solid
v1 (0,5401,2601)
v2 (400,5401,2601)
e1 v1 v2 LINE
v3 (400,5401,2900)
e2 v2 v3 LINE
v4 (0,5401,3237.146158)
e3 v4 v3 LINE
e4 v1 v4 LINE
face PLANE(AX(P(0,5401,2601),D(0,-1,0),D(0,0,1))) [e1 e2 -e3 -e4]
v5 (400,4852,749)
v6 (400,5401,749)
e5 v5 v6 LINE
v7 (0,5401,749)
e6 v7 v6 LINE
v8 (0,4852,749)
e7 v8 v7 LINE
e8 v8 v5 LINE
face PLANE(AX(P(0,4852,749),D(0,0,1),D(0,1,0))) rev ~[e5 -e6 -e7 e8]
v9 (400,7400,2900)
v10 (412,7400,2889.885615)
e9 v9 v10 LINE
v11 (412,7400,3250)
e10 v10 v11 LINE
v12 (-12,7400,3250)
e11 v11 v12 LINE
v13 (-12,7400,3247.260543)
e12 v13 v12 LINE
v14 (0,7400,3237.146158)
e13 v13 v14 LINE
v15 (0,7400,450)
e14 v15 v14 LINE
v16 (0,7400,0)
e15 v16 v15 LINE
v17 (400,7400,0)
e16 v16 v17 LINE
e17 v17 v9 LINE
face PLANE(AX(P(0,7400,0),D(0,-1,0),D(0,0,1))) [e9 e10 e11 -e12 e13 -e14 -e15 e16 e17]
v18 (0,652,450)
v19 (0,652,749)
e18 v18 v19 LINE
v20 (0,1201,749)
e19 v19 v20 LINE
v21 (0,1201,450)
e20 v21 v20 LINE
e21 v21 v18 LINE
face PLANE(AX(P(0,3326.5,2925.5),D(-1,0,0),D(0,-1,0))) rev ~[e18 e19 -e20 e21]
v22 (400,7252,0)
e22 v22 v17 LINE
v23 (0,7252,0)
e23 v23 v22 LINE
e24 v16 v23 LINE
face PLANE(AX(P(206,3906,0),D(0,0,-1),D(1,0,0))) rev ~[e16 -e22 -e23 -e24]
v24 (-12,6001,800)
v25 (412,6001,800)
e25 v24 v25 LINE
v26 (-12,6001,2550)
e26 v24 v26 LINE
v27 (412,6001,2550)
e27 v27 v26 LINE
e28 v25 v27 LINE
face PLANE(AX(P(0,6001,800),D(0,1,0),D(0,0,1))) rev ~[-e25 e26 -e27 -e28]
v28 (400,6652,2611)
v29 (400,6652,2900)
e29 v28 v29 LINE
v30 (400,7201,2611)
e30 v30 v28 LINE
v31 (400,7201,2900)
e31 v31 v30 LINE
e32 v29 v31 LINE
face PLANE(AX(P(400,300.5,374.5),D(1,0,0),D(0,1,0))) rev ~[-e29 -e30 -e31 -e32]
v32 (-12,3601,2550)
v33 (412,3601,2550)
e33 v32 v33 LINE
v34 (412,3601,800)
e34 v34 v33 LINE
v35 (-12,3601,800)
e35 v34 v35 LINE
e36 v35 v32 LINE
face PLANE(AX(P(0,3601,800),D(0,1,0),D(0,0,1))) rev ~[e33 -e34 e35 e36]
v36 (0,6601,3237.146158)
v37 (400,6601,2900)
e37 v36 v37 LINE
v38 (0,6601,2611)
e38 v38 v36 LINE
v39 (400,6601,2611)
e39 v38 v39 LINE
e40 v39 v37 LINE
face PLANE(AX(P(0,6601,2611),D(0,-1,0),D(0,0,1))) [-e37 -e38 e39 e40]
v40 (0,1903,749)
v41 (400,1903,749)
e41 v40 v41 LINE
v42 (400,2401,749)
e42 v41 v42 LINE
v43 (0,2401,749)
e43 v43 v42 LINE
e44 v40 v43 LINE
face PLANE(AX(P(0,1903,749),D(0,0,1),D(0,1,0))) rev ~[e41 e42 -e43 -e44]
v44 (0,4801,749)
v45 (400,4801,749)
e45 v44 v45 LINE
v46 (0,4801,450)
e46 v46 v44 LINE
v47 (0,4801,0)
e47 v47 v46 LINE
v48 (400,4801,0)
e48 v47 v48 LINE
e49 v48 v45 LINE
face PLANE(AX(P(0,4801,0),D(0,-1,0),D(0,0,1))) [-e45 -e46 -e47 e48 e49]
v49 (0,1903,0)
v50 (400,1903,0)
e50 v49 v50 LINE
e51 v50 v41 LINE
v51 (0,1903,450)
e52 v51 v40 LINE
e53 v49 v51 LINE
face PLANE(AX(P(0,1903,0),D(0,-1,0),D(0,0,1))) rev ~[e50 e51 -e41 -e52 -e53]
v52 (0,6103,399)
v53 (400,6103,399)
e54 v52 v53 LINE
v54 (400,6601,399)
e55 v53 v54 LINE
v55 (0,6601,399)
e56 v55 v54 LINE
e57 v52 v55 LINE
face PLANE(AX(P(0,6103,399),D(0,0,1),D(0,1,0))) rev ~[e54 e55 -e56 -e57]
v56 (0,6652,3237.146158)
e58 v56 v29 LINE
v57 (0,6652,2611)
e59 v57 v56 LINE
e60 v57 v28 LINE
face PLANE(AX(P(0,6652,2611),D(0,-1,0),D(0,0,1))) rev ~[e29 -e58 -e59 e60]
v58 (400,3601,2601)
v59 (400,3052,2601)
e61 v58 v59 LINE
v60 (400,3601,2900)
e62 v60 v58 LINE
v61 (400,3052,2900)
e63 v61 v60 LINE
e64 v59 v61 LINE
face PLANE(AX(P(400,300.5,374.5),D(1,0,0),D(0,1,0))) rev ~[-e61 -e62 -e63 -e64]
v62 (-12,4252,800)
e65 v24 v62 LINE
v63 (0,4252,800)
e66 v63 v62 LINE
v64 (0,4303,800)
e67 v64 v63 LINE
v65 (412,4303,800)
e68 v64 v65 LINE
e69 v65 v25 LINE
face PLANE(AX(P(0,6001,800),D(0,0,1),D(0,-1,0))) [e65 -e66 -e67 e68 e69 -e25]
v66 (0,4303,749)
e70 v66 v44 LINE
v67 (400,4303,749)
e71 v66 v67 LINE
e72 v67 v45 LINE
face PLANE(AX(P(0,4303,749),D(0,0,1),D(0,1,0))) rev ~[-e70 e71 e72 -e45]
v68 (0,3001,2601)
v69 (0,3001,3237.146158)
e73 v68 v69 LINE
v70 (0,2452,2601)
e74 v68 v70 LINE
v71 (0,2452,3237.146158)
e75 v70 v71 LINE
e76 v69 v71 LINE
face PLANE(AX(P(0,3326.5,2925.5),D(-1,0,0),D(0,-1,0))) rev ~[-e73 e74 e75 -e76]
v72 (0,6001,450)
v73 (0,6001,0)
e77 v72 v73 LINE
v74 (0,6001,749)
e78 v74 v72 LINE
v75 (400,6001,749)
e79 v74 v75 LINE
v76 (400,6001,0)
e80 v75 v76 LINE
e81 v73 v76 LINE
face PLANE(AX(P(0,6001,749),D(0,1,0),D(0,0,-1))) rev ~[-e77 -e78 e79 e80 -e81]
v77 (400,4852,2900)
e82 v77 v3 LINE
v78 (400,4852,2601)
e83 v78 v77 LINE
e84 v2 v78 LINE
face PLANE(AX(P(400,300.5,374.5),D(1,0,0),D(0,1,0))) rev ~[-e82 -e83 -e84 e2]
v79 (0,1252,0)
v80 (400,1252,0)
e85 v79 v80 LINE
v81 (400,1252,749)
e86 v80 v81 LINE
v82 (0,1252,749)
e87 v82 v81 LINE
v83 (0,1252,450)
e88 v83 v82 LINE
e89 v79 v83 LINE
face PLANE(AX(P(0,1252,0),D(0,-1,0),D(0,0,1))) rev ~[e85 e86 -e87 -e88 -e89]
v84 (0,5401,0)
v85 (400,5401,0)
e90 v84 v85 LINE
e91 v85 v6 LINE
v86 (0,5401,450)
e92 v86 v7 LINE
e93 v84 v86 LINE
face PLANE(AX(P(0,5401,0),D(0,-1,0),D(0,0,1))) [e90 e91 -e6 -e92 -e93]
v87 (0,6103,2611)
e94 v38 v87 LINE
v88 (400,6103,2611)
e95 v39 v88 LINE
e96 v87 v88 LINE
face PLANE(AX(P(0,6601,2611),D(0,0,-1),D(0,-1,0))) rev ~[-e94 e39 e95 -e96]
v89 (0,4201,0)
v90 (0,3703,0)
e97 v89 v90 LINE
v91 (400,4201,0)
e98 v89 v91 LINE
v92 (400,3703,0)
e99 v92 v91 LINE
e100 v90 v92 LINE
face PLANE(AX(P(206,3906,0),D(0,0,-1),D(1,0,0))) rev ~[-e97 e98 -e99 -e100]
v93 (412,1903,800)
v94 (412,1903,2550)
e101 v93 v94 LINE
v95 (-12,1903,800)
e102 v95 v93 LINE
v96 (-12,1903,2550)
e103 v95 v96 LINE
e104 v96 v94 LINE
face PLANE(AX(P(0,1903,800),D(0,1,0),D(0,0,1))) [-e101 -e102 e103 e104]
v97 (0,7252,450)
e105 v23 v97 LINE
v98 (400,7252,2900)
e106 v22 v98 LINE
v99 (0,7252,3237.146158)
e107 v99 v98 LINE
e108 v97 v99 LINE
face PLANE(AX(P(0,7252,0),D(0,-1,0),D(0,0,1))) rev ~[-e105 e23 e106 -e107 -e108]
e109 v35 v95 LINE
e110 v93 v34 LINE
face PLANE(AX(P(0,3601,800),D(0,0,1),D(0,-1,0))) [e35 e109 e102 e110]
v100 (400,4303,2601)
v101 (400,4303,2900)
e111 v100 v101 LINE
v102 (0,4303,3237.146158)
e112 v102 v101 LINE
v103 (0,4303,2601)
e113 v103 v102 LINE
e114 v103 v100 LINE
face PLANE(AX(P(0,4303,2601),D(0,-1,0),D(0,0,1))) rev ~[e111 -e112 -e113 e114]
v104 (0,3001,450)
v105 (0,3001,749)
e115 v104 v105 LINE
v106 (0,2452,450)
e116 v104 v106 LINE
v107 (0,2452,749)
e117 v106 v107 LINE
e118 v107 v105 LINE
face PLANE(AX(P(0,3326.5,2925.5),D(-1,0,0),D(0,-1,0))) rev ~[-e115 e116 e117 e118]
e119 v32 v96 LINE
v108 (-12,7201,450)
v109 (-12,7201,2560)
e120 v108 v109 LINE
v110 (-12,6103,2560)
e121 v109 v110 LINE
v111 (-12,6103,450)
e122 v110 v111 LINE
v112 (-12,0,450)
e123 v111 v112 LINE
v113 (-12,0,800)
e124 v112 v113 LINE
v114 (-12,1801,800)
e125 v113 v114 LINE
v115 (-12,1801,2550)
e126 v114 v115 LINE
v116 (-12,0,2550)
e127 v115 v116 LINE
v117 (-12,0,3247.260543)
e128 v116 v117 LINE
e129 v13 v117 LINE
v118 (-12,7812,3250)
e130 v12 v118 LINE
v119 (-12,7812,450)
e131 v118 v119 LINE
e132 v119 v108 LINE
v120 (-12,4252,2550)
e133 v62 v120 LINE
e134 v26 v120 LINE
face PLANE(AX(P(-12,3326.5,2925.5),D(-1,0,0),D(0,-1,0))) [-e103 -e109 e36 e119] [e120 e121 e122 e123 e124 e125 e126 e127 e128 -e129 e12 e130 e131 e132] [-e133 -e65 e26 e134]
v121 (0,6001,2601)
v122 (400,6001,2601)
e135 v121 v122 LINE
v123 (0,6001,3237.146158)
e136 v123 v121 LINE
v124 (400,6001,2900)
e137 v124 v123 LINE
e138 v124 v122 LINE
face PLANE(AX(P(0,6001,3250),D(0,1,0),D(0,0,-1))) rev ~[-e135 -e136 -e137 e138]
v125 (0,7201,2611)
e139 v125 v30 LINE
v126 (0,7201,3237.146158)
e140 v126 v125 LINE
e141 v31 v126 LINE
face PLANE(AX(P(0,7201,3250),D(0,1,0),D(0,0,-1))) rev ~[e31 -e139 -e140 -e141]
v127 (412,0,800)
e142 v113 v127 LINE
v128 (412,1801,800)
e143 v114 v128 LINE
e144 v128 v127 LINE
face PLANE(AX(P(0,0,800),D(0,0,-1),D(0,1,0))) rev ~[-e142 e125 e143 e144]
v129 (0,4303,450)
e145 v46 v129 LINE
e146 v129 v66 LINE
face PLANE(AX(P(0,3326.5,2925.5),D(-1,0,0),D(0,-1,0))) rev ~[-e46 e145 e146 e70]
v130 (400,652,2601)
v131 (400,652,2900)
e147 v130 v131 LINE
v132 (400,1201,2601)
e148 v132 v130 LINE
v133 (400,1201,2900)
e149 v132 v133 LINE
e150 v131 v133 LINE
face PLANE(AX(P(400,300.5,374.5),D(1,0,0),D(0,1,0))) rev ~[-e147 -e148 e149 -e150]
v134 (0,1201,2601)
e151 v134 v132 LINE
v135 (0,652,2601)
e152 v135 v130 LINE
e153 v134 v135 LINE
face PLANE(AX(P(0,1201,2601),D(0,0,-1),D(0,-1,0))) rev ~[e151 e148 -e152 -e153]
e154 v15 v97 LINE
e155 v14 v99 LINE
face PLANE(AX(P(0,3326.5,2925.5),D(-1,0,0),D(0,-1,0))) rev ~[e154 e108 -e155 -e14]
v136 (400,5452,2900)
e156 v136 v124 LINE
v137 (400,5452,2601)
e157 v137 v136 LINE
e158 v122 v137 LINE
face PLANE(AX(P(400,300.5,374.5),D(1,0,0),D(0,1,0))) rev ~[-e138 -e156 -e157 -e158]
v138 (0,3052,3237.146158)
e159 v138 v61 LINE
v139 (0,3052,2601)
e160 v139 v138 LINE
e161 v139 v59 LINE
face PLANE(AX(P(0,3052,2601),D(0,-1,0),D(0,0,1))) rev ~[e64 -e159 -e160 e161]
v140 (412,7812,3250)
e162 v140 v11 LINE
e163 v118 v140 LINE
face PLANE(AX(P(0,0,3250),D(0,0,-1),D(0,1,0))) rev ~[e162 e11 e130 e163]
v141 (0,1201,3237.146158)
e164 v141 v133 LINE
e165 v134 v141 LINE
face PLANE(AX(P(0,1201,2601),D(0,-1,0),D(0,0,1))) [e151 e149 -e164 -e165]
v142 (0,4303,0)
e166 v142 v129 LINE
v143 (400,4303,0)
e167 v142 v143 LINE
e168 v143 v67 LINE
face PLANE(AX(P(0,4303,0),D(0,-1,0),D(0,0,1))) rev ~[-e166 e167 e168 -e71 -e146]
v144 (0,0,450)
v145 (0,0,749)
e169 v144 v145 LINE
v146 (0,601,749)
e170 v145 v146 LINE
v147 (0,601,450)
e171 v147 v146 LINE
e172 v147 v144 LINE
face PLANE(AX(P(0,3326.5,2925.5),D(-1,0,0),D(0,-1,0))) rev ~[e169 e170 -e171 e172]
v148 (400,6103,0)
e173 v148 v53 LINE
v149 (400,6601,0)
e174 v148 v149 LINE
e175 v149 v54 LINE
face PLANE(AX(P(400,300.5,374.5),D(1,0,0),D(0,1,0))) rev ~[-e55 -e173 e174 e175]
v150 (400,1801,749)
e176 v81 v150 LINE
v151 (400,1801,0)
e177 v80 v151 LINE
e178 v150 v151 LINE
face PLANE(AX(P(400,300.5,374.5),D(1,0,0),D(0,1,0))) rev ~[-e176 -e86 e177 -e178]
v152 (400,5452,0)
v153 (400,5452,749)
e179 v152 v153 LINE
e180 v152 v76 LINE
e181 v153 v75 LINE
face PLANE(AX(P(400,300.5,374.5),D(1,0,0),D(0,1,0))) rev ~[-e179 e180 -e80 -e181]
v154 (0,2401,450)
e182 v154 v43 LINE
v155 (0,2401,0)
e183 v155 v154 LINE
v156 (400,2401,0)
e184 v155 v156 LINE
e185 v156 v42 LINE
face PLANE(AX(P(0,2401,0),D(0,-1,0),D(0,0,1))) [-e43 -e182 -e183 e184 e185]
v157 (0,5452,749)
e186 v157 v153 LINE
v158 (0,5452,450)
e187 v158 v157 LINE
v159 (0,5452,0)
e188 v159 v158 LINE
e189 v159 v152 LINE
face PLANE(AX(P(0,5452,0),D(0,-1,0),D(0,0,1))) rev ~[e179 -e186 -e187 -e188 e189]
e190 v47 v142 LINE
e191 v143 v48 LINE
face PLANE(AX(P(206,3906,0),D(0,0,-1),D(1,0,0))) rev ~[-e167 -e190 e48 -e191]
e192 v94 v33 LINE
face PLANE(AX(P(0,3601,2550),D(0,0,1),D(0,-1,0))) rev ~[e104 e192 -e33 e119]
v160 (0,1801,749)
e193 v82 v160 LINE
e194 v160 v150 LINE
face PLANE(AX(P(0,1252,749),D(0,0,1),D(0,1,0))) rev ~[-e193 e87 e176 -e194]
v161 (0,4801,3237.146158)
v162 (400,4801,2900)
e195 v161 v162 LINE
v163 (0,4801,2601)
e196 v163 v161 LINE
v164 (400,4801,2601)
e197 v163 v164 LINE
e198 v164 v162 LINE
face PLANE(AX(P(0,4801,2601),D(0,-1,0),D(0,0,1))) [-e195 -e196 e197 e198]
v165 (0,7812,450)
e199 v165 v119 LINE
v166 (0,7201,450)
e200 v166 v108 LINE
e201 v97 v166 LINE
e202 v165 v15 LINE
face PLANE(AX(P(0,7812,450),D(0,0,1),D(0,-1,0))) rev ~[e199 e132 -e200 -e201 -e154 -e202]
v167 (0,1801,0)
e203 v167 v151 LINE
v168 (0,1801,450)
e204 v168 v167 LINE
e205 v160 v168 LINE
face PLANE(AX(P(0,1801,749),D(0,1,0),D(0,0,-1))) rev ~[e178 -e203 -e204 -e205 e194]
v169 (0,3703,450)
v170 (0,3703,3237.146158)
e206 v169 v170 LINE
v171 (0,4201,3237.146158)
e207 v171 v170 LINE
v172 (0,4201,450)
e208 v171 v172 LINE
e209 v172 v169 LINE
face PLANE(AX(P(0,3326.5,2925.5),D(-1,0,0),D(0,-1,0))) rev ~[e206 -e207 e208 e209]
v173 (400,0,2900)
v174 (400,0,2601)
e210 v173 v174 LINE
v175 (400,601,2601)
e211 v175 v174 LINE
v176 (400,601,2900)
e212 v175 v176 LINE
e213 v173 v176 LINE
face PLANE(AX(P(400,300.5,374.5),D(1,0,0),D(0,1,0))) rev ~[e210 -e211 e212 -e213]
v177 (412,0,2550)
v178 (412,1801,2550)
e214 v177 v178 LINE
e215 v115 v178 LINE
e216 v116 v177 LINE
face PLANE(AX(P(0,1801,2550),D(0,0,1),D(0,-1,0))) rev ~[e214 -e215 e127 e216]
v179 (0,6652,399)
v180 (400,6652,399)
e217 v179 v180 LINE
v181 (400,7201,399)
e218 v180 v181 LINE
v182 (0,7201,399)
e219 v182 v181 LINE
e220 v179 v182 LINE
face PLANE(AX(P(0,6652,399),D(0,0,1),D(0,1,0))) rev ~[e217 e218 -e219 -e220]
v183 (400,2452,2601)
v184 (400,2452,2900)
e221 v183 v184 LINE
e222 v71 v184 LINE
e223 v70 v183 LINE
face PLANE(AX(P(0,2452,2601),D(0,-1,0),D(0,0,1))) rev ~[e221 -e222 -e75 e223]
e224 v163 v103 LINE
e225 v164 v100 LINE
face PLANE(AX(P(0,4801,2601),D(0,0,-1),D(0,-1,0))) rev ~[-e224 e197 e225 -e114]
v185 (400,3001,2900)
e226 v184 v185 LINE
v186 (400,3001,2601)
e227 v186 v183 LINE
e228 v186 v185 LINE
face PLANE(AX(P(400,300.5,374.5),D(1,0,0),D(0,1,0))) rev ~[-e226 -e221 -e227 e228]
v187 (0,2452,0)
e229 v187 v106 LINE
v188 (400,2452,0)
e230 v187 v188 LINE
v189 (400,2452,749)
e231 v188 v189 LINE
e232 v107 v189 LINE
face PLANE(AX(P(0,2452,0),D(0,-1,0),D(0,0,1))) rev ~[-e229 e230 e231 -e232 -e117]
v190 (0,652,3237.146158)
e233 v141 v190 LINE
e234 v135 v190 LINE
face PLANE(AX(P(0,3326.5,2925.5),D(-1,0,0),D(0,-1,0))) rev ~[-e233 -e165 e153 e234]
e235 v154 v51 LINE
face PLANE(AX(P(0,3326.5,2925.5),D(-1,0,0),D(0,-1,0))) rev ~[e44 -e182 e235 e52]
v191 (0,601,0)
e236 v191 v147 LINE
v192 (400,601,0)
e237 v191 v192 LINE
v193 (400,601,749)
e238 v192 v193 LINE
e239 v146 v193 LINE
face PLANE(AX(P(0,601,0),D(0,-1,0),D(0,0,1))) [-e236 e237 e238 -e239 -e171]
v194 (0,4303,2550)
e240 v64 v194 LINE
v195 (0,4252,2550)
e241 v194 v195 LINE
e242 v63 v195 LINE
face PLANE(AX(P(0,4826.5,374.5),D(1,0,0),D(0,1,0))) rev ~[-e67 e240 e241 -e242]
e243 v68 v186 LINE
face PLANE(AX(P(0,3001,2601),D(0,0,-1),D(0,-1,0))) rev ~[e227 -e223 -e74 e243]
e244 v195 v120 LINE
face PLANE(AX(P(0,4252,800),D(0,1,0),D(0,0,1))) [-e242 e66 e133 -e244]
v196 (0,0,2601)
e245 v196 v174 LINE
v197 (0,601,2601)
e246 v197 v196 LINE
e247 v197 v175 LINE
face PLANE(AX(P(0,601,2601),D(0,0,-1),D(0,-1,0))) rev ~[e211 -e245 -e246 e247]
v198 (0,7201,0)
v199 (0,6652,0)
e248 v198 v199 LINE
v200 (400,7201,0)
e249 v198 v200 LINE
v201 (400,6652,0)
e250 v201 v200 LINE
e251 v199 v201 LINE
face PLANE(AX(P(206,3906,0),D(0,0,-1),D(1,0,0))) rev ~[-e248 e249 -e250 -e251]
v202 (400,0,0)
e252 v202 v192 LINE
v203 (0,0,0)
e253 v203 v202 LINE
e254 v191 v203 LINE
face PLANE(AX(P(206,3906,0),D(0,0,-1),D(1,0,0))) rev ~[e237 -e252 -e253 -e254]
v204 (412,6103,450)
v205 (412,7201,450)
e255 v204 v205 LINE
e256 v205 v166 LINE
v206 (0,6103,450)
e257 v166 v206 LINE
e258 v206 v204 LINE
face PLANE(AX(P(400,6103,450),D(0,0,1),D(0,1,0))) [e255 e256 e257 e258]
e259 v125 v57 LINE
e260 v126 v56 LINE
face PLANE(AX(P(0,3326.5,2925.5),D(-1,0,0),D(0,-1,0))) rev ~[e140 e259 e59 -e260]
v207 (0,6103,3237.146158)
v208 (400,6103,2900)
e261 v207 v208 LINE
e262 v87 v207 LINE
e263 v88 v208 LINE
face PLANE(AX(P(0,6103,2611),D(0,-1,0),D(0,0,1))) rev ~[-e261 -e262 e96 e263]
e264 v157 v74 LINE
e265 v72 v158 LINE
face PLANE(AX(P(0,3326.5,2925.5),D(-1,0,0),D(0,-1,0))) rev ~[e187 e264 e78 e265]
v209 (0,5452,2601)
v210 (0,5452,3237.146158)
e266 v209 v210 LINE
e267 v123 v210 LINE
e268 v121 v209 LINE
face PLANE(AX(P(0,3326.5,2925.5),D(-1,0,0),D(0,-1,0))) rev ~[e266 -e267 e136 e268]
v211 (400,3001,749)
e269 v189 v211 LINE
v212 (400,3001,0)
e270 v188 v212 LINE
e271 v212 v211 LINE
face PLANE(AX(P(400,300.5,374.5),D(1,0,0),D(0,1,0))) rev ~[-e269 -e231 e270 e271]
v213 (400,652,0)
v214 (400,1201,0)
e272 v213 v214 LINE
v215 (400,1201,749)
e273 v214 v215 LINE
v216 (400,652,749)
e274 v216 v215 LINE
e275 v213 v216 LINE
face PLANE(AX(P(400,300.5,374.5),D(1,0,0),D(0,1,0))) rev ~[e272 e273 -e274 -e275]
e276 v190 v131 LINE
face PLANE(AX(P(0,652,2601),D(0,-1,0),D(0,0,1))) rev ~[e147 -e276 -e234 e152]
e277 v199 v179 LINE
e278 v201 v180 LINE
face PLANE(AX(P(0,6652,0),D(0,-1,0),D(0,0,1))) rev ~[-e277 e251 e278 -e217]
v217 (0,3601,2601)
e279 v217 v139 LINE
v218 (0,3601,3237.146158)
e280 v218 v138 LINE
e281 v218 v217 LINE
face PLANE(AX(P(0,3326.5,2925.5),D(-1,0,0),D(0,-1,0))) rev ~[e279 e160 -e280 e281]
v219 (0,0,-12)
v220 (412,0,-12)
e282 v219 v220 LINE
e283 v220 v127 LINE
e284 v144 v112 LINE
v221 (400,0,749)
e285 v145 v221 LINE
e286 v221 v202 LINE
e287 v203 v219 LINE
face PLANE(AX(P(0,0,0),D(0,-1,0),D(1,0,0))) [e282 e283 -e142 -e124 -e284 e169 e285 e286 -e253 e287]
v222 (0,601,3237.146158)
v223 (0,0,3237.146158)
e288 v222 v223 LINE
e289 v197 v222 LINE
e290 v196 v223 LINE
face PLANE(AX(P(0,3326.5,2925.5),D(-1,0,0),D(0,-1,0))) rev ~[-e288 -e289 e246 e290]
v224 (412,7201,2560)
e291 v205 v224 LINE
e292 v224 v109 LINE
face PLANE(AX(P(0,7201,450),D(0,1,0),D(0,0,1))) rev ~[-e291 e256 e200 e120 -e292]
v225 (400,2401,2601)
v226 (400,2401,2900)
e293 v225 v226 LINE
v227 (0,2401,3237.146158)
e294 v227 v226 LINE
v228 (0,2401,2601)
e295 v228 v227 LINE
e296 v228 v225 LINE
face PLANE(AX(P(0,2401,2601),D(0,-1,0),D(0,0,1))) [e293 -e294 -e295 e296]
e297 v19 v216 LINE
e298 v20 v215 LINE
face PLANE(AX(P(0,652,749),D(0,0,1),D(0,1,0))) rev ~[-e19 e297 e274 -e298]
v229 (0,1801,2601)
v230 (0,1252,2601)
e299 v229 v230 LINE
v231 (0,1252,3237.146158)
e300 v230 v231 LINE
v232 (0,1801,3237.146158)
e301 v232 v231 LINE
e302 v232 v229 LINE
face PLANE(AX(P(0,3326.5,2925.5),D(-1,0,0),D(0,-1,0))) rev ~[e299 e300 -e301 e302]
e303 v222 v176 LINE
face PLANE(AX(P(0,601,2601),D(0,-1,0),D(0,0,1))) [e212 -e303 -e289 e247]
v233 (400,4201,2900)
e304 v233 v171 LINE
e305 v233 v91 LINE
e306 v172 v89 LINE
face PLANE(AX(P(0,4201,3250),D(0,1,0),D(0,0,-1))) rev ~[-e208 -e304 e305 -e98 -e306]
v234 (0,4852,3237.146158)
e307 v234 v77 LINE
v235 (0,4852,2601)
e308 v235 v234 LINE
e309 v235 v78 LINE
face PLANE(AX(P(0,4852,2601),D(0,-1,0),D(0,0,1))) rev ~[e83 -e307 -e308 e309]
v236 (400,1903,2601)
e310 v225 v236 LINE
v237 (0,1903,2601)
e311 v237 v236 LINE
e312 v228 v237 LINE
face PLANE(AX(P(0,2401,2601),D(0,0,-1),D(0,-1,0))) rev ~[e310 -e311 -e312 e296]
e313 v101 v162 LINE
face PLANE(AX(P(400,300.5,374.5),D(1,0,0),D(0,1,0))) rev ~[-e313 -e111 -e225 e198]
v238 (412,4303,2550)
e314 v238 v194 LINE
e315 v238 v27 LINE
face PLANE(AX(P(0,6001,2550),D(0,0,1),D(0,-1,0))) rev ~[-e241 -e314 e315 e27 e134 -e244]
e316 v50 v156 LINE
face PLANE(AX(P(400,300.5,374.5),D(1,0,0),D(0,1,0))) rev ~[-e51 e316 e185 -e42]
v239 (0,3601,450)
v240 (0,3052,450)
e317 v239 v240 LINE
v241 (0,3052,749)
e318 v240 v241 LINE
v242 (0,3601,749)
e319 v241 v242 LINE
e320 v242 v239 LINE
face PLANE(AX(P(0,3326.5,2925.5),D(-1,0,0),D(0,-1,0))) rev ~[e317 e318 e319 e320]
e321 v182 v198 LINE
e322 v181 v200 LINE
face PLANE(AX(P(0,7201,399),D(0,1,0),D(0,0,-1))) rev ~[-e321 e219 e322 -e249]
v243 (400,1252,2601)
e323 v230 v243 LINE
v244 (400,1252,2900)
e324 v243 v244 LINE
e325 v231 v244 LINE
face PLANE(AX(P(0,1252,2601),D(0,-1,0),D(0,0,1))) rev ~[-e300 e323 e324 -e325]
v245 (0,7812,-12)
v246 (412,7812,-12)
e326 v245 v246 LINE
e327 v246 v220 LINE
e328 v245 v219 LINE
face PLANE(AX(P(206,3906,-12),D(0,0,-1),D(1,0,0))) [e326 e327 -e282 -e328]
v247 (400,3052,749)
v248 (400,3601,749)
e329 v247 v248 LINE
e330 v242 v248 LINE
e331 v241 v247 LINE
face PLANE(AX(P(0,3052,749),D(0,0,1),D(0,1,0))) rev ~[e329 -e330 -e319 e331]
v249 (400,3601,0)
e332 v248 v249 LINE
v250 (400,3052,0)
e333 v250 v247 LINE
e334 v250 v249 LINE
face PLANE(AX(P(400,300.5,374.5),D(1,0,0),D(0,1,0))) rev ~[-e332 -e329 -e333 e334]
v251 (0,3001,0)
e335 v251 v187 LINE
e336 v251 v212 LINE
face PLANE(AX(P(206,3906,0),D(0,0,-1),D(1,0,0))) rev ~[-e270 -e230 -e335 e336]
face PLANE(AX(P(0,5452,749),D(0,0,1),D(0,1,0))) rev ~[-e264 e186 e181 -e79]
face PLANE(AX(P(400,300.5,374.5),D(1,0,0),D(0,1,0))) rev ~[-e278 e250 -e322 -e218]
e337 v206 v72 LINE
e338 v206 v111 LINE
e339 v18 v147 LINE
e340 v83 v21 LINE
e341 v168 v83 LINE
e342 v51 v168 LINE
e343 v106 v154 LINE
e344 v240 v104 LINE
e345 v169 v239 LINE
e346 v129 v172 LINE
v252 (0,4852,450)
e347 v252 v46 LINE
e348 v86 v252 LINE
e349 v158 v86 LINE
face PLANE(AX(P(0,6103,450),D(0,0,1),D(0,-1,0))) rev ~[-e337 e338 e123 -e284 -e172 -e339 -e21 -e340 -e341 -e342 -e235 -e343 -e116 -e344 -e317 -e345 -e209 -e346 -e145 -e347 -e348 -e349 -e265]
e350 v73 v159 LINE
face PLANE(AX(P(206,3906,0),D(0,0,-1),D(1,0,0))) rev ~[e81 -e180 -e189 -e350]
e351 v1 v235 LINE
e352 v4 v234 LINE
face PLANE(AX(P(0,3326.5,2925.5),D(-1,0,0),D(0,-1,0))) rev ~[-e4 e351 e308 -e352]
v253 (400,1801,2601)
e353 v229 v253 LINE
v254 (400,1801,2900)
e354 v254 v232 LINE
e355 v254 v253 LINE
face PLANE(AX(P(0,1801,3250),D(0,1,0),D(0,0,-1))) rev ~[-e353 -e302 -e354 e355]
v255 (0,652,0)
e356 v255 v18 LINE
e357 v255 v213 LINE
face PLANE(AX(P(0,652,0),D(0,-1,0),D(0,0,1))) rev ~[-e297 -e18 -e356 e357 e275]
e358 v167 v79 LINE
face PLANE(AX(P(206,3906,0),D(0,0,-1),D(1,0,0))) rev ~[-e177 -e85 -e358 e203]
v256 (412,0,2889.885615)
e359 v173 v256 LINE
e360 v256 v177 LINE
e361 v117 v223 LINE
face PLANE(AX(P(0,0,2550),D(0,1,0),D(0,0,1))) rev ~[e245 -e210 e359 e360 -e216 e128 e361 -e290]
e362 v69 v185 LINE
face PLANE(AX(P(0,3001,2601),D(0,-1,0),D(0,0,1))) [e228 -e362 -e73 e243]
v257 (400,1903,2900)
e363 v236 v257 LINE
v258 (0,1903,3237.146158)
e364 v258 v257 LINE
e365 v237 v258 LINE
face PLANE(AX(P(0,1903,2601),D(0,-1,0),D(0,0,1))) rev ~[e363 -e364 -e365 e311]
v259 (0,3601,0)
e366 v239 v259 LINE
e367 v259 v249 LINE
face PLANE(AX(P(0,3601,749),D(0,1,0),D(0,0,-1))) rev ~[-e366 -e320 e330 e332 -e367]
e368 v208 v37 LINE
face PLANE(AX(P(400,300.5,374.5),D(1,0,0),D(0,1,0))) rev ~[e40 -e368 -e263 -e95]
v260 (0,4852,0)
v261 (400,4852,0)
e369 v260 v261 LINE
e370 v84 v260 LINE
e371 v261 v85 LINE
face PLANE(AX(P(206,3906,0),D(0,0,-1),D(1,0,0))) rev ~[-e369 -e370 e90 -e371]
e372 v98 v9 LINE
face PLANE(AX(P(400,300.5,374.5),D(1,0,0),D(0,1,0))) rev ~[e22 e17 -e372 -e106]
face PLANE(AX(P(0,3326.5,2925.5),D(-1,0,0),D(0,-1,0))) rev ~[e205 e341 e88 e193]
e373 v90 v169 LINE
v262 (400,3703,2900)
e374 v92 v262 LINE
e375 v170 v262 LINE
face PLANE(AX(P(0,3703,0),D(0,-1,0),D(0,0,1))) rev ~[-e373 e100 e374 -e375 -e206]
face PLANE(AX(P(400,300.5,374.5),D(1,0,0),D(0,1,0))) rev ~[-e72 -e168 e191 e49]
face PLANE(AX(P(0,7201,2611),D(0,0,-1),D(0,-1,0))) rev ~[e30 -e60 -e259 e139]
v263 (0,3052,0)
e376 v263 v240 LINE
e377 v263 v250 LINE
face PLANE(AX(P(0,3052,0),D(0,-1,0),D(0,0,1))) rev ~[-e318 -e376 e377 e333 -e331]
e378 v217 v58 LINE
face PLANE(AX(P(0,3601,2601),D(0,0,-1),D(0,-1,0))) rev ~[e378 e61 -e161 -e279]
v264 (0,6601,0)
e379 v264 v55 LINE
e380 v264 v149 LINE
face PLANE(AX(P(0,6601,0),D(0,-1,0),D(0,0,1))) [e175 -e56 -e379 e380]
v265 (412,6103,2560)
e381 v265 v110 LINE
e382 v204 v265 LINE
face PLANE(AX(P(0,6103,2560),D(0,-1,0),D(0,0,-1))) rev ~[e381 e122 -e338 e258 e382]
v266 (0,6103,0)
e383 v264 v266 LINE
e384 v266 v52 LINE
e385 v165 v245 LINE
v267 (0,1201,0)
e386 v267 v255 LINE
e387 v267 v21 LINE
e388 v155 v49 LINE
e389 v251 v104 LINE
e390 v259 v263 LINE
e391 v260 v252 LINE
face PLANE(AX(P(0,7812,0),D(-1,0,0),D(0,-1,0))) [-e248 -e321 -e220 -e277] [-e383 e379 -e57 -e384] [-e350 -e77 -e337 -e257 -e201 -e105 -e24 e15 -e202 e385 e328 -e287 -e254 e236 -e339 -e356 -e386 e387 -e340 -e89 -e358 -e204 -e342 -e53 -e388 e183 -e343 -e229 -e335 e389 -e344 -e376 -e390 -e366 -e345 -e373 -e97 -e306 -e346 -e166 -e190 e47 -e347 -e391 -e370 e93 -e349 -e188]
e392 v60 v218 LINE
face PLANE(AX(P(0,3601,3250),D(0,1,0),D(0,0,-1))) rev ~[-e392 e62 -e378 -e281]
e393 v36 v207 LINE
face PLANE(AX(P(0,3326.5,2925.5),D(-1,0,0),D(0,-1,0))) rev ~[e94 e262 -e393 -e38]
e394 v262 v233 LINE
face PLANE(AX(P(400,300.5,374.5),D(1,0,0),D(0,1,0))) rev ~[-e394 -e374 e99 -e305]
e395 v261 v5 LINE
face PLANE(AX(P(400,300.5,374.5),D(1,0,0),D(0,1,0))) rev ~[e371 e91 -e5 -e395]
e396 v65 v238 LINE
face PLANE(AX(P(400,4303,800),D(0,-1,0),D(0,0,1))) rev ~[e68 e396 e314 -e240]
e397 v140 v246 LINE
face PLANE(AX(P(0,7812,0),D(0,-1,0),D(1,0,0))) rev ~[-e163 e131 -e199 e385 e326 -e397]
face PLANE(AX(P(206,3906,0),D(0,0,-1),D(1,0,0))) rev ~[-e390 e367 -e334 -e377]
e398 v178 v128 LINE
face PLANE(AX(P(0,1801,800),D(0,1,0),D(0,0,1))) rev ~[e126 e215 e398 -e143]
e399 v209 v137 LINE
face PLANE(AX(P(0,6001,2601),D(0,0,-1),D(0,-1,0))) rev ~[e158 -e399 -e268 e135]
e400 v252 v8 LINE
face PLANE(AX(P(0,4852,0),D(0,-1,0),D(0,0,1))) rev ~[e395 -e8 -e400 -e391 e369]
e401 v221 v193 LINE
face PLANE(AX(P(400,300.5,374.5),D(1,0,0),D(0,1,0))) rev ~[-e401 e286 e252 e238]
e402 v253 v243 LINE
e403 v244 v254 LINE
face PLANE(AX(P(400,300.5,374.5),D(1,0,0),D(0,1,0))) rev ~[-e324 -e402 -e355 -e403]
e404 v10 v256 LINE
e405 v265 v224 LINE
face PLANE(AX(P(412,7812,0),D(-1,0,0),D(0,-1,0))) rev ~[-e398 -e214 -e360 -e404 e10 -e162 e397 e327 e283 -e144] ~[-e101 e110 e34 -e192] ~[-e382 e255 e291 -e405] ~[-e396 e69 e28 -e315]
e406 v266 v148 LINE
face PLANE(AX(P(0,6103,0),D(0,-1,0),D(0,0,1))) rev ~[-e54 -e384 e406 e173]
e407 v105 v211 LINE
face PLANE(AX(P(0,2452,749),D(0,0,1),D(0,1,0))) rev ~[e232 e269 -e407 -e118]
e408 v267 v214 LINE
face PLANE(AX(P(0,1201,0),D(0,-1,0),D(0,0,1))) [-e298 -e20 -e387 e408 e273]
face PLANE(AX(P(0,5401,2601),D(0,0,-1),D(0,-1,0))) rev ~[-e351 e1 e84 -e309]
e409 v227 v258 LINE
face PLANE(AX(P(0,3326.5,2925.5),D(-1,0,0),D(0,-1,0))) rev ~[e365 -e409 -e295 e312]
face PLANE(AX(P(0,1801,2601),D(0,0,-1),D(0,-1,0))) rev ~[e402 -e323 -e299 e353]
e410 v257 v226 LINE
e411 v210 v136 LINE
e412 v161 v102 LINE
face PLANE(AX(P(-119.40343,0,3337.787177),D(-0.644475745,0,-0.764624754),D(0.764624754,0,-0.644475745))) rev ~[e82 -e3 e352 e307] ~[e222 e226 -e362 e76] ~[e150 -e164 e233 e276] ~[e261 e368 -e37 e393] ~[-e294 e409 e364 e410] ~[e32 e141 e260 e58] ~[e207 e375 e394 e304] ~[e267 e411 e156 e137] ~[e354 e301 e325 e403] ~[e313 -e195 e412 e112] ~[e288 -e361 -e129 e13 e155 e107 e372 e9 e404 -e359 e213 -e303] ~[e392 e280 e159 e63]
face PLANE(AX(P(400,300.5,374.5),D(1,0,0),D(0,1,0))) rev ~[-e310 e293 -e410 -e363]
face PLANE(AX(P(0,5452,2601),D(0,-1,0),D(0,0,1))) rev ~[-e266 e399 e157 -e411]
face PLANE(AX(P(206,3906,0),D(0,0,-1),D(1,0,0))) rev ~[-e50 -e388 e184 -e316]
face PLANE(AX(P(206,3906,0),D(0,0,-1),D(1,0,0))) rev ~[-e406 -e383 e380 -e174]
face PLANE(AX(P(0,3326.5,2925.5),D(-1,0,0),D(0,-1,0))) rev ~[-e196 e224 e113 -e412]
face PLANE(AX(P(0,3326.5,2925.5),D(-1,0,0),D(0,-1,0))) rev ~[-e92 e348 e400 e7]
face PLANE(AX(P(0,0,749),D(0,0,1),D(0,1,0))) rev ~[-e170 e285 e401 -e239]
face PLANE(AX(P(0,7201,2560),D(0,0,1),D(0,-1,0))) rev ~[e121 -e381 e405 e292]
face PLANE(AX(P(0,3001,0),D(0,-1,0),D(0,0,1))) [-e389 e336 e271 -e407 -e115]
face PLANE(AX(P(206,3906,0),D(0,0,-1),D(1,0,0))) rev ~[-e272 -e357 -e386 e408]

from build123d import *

# Parameters (mm, degrees)
F0_W     = 51
F0_H     = 649
F0_H_2   = 749
F0_H_3   = 3250
F1_DEPTH = 400
F0_H_4   = 399
F0_H_5   = 639
F0_H_6   = 51
F0_H_7   = 1750
F0_W_2   = 412
F2_W     = 601
F2_H     = 749
F2_W_2   = 549
F2_W_3   = 498
F2_H_2   = 649
F2_W_4   = 1698
F2_H_3   = 1750
F2_W_5   = 4109
F2_H_4   = 3250
F2_W_6   = 1098
F2_H_5   = 2110
F3_DEPTH = 12
F4_W     = 549
F4_H     = 649
F4_W_2   = 498
F4_W_3   = 601
F4_H_2   = 299
F4_W_4   = 1749
F4_H_3   = 1750
F4_W_5   = 1698
F5_DEPTH = 12
F6_W     = 412
F6_H     = 7812
F7_DEPTH = 12
F9_DEPTH = 7400


# Not quite as in the source:
# - a feature names something its author has since deleted; it is built from what else it names


with BuildPart() as f1:
    # F0 (on Right) → F1 (new body)
    with BuildSketch(Plane.YZ):
        with Locations((626.5, 2925.5)):
            Rectangle(F0_W, F0_H)
        with Locations((1226.5, 374.5)):
            Rectangle(F0_W, F0_H_2)
        with Locations((3026.5, 374.5)):
            Rectangle(F0_W, F0_H_2)
        with Locations((1226.5, 2925.5)):
            Rectangle(F0_W, F0_H)
        Polygon((1801, 2550), (1801, 800), (1801, 749), (1801, 0), (1852, 0), (1852, 3250), (1801, 3250), (1801, 2601), align=None)
        with Locations((3026.5, 2925.5)):
            Rectangle(F0_W, F0_H)
        Polygon((3601, 2550), (3601, 800), (3601, 749), (3601, 0), (3652, 0), (3652, 3250), (3601, 3250), (3601, 2601), align=None)
        Polygon((0, 800), (0, 749), (601, 749), (652, 749), (1201, 749), (1252, 749), (1801, 749), (1801, 800), align=None)
        Polygon((0, 2601), (0, 2550), (1801, 2550), (1801, 2601), (1252, 2601), (1201, 2601), (652, 2601), (601, 2601), align=None)
        with Locations((626.5, 374.5)):
            Rectangle(F0_W, F0_H_2)
        Polygon((1852, 3250), (1852, 0), (1903, 0), (1903, 749), (1903, 800), (1903, 2550), (1903, 2601), (1903, 3250), align=None)
        Polygon((1903, 800), (1903, 749), (2401, 749), (2452, 749), (3001, 749), (3052, 749), (3601, 749), (3601, 800), align=None)
        with Locations((2426.5, 374.5)):
            Rectangle(F0_W, F0_H_2)
        with Locations((2426.5, 2925.5)):
            Rectangle(F0_W, F0_H)
        Polygon((2401, 2601), (1903, 2601), (1903, 2550), (3601, 2550), (3601, 2601), (3052, 2601), (3001, 2601), (2452, 2601), align=None)
        with Locations((3677.5, 1625)):
            Rectangle(F0_W, F0_H_3)
    extrude(amount=F1_DEPTH)



with BuildPart() as f1b:
    # F0 (on Right) → F1, piece 2 (new body)
    with BuildSketch(Plane.YZ):
        with Locations((4826.5, 374.5)):
            Rectangle(F0_W, F0_H_2)
        Polygon((6001, 2550), (6001, 800), (6001, 749), (6001, 0), (6052, 0), (6052, 749), (6052, 2601), (6052, 3250), (6001, 3250), (6001, 2601), align=None)
        with Locations((6626.5, 199.5)):
            Rectangle(F0_W, F0_H_4)
        with Locations((6626.5, 2930.5)):
            Rectangle(F0_W, F0_H_5)
        Polygon((4201, 3250), (4201, 0), (4252, 0), (4252, 749), (4252, 800), (4252, 2550), (4252, 2601), (4252, 3250), align=None)
        with Locations((5426.5, 2925.5)):
            Rectangle(F0_W, F0_H)
        Polygon((7201, 399), (7201, 0), (7252, 0), (7252, 3250), (7201, 3250), (7201, 2611), (7201, 2560), (7201, 450), align=None)
        with Locations((4277.5, 774.5)):
            Rectangle(F0_W, F0_H_6)
        Polygon((4303, 800), (4303, 749), (4801, 749), (4852, 749), (5401, 749), (5452, 749), (6001, 749), (6001, 800), align=None)
        Polygon((6601, 2611), (6103, 2611), (6103, 2560), (7201, 2560), (7201, 2611), (6652, 2611), align=None)
        Polygon((6103, 450), (6103, 399), (6601, 399), (6652, 399), (7201, 399), (7201, 450), align=None)
        with Locations((5426.5, 374.5)):
            Rectangle(F0_W, F0_H_2)
        Polygon((6052, 749), (6052, 0), (6103, 0), (6103, 399), (6103, 450), (6103, 2560), (6103, 2611), (6103, 3250), (6052, 3250), (6052, 2601), align=None)
        with Locations((4826.5, 2925.5)):
            Rectangle(F0_W, F0_H)
        Polygon((4801, 2601), (4303, 2601), (4303, 2550), (6001, 2550), (6001, 2601), (5452, 2601), (5401, 2601), (4852, 2601), align=None)
        with Locations((4277.5, 2925.5)):
            Rectangle(F0_W, F0_H)
        with Locations((4277.5, 1675)):
            Rectangle(F0_W, F0_H_7)
        with Locations((4277.5, 2575.5)):
            Rectangle(F0_W, F0_H_6)
        with Locations((4277.5, 374.5)):
            Rectangle(F0_W, F0_H_2)
    extrude(amount=F1_DEPTH)


with BuildPart() as f1c:
    # F0 (on Right) → F1, piece 3 (new body)
    with BuildSketch(Plane.YZ):
        with Locations((7606, 1625)):
            Rectangle(F0_W_2, F0_H_3)
    extrude(amount=F1_DEPTH)


with BuildPart() as f1_1:
    add(f1.part)

    add(f1b.part)  # F3 merges F1b

    add(f1c.part)  # F3 merges F1c
    # F2 (on face) → F3 (join)
    with BuildSketch(Plane.YZ.offset(400)):
        with Locations((300.5, 374.5)):
            Rectangle(F2_W, F2_H)
        with Locations((926.5, 374.5)):
            Rectangle(F2_W_2, F2_H)
        with Locations((1526.5, 374.5)):
            Rectangle(F2_W_2, F2_H)
        with Locations((2152, 374.5)):
            Rectangle(F2_W_3, F2_H)
        with Locations((2726.5, 374.5)):
            Rectangle(F2_W_2, F2_H)
        with Locations((3326.5, 374.5)):
            Rectangle(F2_W_2, F2_H)
        with Locations((300.5, 2925.5)):
            Rectangle(F2_W, F2_H_2)
        with Locations((926.5, 2925.5)):
            Rectangle(F2_W_2, F2_H_2)
        with Locations((1526.5, 2925.5)):
            Rectangle(F2_W_2, F2_H_2)
        with Locations((2152, 2925.5)):
            Rectangle(F2_W_3, F2_H_2)
        with Locations((2726.5, 2925.5)):
            Rectangle(F2_W_2, F2_H_2)
        with Locations((3326.5, 2925.5)):
            Rectangle(F2_W_2, F2_H_2)
        Polygon((601, 749), (601, 0), (652, 0), (652, 749), (1201, 749), (1201, 0), (1252, 0), (1252, 749), (1801, 749), (1801, 0), (1903, 0), (1903, 749), (2401, 749), (2401, 0), (2452, 0), (2452, 749), (3001, 749), (3001, 0), (3052, 0), (3052, 749), (3601, 749), (3601, 0), (3703, 0), (3703, 3250), (3601, 3250), (3601, 2601), (3052, 2601), (3052, 3250), (3001, 3250), (3001, 2601), (2452, 2601), (2452, 3250), (2401, 3250), (2401, 2601), (1903, 2601), (1903, 3250), (1801, 3250), (1801, 2601), (1252, 2601), (1252, 3250), (1201, 3250), (1201, 2601), (652, 2601), (652, 3250), (601, 3250), (601, 2601), (0, 2601), (0, 2550), (1801, 2550), (1801, 800), (0, 800), (0, 749), align=None)
        with Locations((2752, 1675)):
            Rectangle(F2_W_4, F2_H_3, mode=Mode.SUBTRACT)
        with Locations((5757.5, 1625)):
            Rectangle(F2_W_5, F2_H_4)
        with Locations((6652, 1505)):
            Rectangle(F2_W_6, F2_H_5, mode=Mode.SUBTRACT)
        with Locations((5152, 1675)):
            Rectangle(F2_W_4, F2_H_3, mode=Mode.SUBTRACT)
    extrude(amount=F3_DEPTH)

    # F4 (on face) → F5 (join)
    with BuildSketch(Plane(origin=(0, 0, 0), x_dir=(0, -1, 0), z_dir=(-1, 0, 0))):
        with Locations((-3326.5, 2925.5)):
            Rectangle(F4_W, F4_H)
        with Locations((-2726.5, 2925.5)):
            Rectangle(F4_W, F4_H)
        with Locations((-2152, 2925.5)):
            Rectangle(F4_W_2, F4_H)
        with Locations((-1526.5, 2925.5)):
            Rectangle(F4_W, F4_H)
        with Locations((-926.5, 2925.5)):
            Rectangle(F4_W, F4_H)
        with Locations((-300.5, 2925.5)):
            Rectangle(F4_W_3, F4_H)
        with Locations((-300.5, 599.5)):
            Rectangle(F4_W_3, F4_H_2)
        Polygon((-3703, 450), (-3703, 3250), (-7812, 3250), (-7812, 450), (-7201, 450), (-7201, 2560), (-6103, 2560), (-6103, 450), align=None)
        with Locations((-5126.5, 1675)):
            Rectangle(F4_W_4, F4_H_3, mode=Mode.SUBTRACT)
        with Locations((-3326.5, 599.5)):
            Rectangle(F4_W, F4_H_2)
        with Locations((-2726.5, 599.5)):
            Rectangle(F4_W, F4_H_2)
        with Locations((-2152, 599.5)):
            Rectangle(F4_W_2, F4_H_2)
        with Locations((-1526.5, 599.5)):
            Rectangle(F4_W, F4_H_2)
        with Locations((-926.5, 599.5)):
            Rectangle(F4_W, F4_H_2)
        Polygon((-1801, 800), (-1801, 2550), (0, 2550), (0, 2601), (-601, 2601), (-601, 3250), (-652, 3250), (-652, 2601), (-1201, 2601), (-1201, 3250), (-1252, 3250), (-1252, 2601), (-1801, 2601), (-1801, 3250), (-1903, 3250), (-1903, 2601), (-2401, 2601), (-2401, 3250), (-2452, 3250), (-2452, 2601), (-3001, 2601), (-3001, 3250), (-3052, 3250), (-3052, 2601), (-3601, 2601), (-3601, 3250), (-3703, 3250), (-3703, 450), (-3601, 450), (-3601, 749), (-3052, 749), (-3052, 450), (-3001, 450), (-3001, 749), (-2452, 749), (-2452, 450), (-2401, 450), (-2401, 749), (-1903, 749), (-1903, 450), (-1801, 450), (-1801, 749), (-1252, 749), (-1252, 450), (-1201, 450), (-1201, 749), (-652, 749), (-652, 450), (-601, 450), (-601, 749), (0, 749), (0, 800), align=None)
        with Locations((-2752, 1675)):
            Rectangle(F4_W_5, F4_H_3, mode=Mode.SUBTRACT)
    extrude(amount=F5_DEPTH)

    # F6 (on face) → F7 (join)
    with BuildSketch(Plane(origin=(0, 0, 0), x_dir=(1, 0, 0), z_dir=(0, 0, -1))):
        with Locations((206, -3906)):
            Rectangle(F6_W, F6_H)
    extrude(amount=F7_DEPTH)

    # F8 (on face) → F9 (cut)
    with BuildSketch(Plane.XZ):
        Polygon((0, 3237.1461581129), (400, 2900), (515.7678202297, 2802.4233104411), (515.7678202297, 3337.787177324), (-119.4034299835, 3337.787177324), (-12, 3247.2605428563), align=None)
    extrude(amount=-F9_DEPTH, mode=Mode.SUBTRACT)


solid = f1_1.part
